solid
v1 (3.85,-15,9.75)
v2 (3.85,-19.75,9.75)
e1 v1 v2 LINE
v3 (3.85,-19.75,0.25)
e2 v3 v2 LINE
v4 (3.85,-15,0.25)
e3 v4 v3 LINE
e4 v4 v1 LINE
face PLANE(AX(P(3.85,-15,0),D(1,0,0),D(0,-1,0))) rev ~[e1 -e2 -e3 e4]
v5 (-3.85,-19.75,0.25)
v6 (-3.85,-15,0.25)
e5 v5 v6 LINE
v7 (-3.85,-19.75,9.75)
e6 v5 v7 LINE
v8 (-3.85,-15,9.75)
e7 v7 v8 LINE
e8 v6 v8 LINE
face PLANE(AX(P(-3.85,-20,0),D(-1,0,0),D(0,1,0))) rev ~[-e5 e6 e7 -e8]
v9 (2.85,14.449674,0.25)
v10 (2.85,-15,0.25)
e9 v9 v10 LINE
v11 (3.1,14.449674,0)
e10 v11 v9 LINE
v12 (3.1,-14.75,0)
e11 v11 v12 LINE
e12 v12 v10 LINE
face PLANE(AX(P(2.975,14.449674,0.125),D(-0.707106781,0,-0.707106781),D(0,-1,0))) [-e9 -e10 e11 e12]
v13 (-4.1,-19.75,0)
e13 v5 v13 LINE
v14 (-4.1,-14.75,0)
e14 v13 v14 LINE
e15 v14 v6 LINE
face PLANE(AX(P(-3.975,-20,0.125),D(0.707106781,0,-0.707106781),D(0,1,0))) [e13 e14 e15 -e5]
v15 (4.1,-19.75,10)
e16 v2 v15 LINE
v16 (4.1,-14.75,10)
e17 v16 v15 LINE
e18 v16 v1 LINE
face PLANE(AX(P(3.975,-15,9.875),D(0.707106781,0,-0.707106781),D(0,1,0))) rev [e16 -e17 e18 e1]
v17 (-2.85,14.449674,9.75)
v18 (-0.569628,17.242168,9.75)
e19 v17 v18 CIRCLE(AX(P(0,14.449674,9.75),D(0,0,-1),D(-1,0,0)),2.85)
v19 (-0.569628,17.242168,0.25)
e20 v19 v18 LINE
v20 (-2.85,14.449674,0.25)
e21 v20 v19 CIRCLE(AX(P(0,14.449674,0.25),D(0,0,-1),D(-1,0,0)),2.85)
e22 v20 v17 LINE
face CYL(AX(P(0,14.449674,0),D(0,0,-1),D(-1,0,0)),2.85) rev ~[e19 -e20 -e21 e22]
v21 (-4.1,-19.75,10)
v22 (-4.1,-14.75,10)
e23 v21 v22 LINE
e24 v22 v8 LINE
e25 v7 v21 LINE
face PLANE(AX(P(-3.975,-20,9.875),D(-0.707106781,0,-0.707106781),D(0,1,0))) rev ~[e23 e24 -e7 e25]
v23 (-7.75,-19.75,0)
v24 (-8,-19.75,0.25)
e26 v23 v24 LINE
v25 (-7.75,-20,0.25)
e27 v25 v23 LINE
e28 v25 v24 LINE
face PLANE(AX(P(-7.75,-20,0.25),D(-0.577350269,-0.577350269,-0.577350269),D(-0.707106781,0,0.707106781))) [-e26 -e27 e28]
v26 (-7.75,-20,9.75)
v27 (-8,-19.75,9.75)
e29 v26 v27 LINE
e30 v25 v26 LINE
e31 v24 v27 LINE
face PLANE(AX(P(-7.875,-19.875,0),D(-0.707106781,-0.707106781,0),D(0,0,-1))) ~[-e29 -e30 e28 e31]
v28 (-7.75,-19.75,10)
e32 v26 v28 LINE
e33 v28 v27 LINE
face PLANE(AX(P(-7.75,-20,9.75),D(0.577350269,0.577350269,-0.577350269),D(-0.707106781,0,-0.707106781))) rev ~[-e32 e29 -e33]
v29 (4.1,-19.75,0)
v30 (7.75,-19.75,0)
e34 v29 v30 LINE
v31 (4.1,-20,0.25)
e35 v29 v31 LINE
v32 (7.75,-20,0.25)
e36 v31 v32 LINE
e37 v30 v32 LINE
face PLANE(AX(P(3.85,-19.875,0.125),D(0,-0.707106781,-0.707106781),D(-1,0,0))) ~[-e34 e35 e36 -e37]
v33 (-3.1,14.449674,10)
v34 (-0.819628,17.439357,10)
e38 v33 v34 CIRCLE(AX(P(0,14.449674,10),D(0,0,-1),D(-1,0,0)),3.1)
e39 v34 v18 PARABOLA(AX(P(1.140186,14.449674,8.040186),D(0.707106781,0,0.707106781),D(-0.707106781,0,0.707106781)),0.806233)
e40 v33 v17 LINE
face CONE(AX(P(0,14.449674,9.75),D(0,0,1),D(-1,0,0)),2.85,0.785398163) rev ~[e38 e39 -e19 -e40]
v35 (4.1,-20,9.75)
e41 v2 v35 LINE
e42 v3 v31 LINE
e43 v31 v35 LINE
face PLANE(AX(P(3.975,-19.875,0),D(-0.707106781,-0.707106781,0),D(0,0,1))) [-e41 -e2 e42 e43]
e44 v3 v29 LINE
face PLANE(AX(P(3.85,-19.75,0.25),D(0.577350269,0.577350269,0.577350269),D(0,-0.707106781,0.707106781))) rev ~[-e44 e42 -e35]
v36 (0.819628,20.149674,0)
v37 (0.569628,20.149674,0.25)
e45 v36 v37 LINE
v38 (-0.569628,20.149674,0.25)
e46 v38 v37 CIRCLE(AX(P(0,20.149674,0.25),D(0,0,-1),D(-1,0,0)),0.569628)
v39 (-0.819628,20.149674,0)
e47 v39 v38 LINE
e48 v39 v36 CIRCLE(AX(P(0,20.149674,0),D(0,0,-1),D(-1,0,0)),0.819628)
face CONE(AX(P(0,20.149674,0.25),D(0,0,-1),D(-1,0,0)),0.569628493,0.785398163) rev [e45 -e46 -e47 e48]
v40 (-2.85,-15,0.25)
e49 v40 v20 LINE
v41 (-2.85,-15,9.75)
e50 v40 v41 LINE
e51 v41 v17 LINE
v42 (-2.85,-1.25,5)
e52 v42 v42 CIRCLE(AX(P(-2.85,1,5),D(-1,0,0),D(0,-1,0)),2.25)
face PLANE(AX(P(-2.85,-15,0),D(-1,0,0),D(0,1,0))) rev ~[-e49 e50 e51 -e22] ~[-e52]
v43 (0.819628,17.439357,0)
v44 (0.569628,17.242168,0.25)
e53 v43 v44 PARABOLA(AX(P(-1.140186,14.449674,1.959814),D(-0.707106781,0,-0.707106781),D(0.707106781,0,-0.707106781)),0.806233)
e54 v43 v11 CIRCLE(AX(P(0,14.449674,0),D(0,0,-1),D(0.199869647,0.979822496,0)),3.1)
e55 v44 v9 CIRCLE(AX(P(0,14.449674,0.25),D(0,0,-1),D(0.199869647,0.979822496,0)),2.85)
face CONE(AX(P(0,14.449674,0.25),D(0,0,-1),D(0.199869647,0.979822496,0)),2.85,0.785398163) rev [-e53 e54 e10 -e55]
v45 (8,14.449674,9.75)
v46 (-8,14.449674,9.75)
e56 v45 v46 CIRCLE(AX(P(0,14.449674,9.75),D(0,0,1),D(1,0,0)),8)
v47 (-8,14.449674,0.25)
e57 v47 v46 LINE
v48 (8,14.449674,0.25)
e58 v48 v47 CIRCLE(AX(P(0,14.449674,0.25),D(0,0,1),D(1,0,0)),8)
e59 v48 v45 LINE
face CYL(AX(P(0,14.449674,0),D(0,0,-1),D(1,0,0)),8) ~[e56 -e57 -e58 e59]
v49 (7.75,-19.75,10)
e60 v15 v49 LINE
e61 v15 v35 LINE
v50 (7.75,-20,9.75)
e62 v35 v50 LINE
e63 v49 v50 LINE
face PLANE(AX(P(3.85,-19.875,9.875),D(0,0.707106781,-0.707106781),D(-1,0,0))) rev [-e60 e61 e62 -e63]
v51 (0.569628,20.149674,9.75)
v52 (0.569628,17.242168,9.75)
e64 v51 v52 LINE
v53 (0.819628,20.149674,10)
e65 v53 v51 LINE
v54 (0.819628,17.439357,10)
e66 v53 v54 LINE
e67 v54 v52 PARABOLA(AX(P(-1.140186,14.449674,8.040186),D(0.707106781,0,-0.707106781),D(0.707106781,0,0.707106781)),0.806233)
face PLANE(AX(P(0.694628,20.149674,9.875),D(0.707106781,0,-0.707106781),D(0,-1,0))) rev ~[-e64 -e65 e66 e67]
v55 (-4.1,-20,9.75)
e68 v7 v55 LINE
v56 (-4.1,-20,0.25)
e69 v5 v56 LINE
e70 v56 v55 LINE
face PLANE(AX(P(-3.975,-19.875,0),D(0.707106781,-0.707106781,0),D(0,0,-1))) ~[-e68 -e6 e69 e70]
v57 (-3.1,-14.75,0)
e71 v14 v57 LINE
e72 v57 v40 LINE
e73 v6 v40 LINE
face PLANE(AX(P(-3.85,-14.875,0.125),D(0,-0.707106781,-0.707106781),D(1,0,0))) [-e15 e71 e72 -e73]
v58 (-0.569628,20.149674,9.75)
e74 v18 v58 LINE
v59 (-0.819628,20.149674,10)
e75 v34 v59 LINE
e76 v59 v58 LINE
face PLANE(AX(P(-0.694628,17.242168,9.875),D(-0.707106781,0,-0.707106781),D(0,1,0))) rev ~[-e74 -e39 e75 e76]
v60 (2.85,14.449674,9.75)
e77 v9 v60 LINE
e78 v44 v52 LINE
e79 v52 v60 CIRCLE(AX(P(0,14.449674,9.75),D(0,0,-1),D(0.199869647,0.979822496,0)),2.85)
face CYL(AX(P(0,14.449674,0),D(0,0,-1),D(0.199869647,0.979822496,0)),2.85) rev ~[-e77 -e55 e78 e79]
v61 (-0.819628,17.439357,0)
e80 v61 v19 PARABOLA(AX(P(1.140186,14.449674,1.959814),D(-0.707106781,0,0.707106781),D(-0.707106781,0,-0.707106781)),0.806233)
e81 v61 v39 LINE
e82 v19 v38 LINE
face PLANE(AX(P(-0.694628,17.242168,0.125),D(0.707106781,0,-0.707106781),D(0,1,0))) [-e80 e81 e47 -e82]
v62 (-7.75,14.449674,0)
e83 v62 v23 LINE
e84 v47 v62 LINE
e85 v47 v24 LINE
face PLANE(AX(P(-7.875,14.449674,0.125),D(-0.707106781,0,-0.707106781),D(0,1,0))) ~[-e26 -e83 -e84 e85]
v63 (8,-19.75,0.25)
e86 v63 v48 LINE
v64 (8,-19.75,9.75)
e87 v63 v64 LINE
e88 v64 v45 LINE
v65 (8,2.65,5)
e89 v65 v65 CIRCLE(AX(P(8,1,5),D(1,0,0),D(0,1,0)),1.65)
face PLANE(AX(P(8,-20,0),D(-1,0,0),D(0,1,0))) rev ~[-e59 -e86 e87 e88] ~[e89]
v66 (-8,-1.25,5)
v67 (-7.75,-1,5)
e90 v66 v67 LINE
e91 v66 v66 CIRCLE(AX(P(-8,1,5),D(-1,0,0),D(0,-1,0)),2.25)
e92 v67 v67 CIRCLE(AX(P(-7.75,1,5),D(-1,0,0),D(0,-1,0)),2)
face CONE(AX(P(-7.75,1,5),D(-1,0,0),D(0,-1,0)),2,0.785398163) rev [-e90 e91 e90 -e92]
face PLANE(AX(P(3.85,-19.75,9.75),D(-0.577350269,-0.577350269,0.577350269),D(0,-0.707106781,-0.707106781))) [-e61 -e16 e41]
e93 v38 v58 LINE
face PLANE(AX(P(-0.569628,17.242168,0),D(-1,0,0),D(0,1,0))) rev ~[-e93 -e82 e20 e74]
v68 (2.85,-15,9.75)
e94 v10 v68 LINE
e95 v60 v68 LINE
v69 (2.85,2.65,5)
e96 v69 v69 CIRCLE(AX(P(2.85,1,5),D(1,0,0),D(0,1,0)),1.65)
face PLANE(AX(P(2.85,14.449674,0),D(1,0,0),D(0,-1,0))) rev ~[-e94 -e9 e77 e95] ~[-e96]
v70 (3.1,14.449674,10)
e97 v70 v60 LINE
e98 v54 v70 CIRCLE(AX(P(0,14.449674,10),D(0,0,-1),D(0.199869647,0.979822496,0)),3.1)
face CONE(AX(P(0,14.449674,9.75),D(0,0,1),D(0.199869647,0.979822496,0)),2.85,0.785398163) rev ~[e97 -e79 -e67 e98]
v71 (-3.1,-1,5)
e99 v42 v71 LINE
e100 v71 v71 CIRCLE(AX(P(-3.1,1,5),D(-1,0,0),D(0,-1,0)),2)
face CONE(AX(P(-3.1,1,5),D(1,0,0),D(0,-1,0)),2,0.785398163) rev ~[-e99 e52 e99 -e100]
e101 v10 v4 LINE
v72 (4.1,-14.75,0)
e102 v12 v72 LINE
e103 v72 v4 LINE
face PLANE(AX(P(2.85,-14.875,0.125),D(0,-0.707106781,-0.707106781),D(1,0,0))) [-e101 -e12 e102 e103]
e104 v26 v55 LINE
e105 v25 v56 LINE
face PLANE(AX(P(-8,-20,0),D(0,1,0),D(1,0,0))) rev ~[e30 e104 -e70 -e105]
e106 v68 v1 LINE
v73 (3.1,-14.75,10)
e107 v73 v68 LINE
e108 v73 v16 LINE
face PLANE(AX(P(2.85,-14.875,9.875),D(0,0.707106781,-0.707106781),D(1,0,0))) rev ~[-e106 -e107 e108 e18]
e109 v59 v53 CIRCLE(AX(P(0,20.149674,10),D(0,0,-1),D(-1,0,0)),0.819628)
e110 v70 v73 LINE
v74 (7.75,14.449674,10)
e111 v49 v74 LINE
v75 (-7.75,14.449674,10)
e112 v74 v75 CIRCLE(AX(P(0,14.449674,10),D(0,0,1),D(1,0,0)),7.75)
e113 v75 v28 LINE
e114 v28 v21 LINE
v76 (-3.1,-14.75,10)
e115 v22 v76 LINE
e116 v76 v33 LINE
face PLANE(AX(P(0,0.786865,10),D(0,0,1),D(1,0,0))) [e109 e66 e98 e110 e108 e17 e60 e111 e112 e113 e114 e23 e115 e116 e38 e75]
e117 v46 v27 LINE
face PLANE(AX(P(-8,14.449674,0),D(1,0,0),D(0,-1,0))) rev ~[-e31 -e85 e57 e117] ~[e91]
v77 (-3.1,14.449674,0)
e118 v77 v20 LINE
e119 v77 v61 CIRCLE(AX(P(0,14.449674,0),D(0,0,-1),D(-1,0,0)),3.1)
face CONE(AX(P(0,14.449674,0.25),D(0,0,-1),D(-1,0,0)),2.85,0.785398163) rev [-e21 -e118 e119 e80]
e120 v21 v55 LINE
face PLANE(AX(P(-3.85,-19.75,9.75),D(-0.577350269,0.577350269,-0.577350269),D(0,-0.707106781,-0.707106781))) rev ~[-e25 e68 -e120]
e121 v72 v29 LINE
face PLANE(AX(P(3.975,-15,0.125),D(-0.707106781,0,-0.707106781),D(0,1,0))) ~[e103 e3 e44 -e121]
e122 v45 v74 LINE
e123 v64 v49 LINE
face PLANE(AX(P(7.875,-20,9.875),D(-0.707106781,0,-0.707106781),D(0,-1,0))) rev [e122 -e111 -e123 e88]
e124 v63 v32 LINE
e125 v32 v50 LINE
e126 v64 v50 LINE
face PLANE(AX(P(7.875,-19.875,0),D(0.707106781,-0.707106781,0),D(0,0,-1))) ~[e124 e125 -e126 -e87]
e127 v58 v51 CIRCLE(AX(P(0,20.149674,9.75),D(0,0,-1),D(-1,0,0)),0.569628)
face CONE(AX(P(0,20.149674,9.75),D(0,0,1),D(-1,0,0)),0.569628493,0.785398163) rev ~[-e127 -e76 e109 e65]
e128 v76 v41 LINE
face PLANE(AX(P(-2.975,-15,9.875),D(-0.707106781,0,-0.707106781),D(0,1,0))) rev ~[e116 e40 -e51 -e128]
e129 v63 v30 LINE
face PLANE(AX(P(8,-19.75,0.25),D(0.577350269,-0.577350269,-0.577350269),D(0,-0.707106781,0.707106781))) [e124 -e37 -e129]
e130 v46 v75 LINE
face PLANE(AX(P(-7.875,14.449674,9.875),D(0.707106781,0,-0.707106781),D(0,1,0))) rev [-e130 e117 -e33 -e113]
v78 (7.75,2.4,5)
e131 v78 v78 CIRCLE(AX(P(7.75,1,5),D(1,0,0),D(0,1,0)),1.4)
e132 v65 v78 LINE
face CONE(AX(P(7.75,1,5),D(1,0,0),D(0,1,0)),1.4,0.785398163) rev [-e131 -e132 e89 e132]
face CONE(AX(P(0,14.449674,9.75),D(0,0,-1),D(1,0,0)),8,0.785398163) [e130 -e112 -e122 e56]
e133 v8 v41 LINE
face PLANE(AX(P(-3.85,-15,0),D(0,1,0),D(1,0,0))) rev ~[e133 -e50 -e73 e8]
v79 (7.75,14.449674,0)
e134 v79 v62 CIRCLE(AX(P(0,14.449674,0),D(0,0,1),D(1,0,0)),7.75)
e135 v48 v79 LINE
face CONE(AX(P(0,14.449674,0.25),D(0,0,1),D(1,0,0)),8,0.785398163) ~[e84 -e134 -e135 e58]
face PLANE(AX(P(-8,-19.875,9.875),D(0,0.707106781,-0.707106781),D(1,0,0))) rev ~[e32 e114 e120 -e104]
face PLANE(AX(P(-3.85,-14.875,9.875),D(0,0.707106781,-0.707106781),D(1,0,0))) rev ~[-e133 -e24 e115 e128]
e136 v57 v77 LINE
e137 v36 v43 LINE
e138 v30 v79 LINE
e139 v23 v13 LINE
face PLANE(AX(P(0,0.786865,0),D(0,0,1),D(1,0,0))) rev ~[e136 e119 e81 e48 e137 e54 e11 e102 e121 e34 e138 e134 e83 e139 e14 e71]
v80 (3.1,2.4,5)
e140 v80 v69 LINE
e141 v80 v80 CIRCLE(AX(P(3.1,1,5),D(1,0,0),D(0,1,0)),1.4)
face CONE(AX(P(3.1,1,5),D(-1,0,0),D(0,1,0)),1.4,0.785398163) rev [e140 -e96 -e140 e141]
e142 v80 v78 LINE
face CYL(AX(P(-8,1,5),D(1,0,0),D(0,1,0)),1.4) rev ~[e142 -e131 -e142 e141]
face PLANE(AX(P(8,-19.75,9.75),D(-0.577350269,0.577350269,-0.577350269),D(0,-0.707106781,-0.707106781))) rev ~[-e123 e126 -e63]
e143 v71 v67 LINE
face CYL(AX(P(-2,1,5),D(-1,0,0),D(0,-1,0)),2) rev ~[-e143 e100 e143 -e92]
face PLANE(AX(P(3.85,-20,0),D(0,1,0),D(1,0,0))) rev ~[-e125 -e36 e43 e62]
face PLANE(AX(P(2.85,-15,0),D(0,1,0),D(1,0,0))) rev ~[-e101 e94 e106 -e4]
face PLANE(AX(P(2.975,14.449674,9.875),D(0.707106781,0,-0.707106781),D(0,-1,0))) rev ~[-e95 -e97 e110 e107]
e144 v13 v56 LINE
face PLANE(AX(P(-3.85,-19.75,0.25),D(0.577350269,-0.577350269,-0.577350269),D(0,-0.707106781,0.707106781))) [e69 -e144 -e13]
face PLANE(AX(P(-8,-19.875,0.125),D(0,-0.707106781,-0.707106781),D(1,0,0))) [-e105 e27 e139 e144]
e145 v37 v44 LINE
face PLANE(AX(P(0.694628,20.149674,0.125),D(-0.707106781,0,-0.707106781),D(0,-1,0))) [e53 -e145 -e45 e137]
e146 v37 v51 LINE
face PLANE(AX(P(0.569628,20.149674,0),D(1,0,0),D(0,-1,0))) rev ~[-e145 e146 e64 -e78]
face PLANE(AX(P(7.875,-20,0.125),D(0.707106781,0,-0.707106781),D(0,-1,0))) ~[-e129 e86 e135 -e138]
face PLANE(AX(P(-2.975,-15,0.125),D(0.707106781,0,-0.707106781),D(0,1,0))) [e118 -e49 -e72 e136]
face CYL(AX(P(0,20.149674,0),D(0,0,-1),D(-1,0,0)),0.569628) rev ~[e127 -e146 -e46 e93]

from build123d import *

# Parameters (mm, degrees)
F1_DEPTH       = 10
F3_D           = 2.8
F3_CBORE_D     = 4
F3_CBORE_DEPTH = 6
F4_SIZE        = 0.25


with BuildPart() as f1:
    # F0 (on Top) → F1 (new body)
    with BuildSketch(Plane.XY):
        with BuildLine():
            Line((3.85, -20), (8, -20))
            Line((8, -20), (8, 14.4496737048))
            ThreePointArc((8, 14.4496737048), (0, 22.4496737048), (-8, 14.4496737048))
            Line((-8, 14.4496737048), (-8, -20))
            Line((-8, -20), (-3.85, -20))
            Line((-3.85, -20), (-3.85, -15))
            Line((-3.85, -15), (-2.85, -15))
            Line((-2.85, -15), (-2.85, 14.4496737048))
            ThreePointArc((-2.85, 14.4496737048), (-2.2074806008, 16.252318816), (-0.5696284934, 17.2421678193))
            Line((-0.5696284934, 17.2421678193), (-0.5696284934, 20.1496737048))
            ThreePointArc((-0.5696284934, 20.1496737048), (0, 20.7193021982), (0.5696284934, 20.1496737048))
            Line((0.5696284934, 20.1496737048), (0.5696284934, 17.2421678193))
            ThreePointArc((0.5696284934, 17.2421678193), (2.2074806008, 16.252318816), (2.85, 14.4496737048))
            Line((2.85, 14.4496737048), (2.85, -15))
            Line((2.85, -15), (3.85, -15))
            Line((3.85, -15), (3.85, -20))
        make_face()
    extrude(amount=F1_DEPTH)

    # F3 (through all)
    with Locations(Plane(origin=(-8, 0, 0), x_dir=(0, -1, 0), z_dir=(-1, 0, 0))):
        with Locations((-1, 5)):
            CounterBoreHole(F3_D / 2, F3_CBORE_D / 2, F3_CBORE_DEPTH)

    # F4
    f4_edges = [f1.edges().sort_by_distance(p)[0] for p in [
        (5.925, -20, 0),
        (8, -2.775163, 0),
        (0, 22.449674, 0),
        (-8, -2.775163, 0),
        (-5.925, -20, 0),
        (-3.85, -17.5, 0),
        (-3.35, -15, 0),
        (-2.85, -0.275163, 0),
        (-2.207481, 16.252319, 0),
        (-0.569628, 18.695921, 0),
        (0, 20.719302, 0),
        (0.569628, 18.695921, 0),
        (2.207481, 16.252319, 0),
        (2.85, -0.275163, 0),
        (3.35, -15, 0),
        (3.85, -17.5, 0),
        (5.925, -20, 10),
        (8, -2.775163, 10),
        (0, 22.449674, 10),
        (-8, -2.775163, 10),
        (-5.925, -20, 10),
        (-3.85, -17.5, 10),
        (-3.35, -15, 10),
        (-2.85, -0.275163, 10),
        (-2.207481, 16.252319, 10),
        (-0.569628, 18.695921, 10),
        (0, 20.719302, 10),
        (0.569628, 18.695921, 10),
        (2.207481, 16.252319, 10),
        (2.85, -0.275163, 10),
        (3.35, -15, 10),
        (3.85, -17.5, 10),
        (-8, -20, 5),
        (-3.85, -20, 5),
        (3.85, -20, 5),
        (8, -20, 5),
        (8, 2.4, 5),
        (2.85, 2.4, 5),
        (-8, 3, 5),
        (-2.85, 3, 5),
    ]]
    chamfer(f4_edges, length=F4_SIZE)


solid = f1.part
